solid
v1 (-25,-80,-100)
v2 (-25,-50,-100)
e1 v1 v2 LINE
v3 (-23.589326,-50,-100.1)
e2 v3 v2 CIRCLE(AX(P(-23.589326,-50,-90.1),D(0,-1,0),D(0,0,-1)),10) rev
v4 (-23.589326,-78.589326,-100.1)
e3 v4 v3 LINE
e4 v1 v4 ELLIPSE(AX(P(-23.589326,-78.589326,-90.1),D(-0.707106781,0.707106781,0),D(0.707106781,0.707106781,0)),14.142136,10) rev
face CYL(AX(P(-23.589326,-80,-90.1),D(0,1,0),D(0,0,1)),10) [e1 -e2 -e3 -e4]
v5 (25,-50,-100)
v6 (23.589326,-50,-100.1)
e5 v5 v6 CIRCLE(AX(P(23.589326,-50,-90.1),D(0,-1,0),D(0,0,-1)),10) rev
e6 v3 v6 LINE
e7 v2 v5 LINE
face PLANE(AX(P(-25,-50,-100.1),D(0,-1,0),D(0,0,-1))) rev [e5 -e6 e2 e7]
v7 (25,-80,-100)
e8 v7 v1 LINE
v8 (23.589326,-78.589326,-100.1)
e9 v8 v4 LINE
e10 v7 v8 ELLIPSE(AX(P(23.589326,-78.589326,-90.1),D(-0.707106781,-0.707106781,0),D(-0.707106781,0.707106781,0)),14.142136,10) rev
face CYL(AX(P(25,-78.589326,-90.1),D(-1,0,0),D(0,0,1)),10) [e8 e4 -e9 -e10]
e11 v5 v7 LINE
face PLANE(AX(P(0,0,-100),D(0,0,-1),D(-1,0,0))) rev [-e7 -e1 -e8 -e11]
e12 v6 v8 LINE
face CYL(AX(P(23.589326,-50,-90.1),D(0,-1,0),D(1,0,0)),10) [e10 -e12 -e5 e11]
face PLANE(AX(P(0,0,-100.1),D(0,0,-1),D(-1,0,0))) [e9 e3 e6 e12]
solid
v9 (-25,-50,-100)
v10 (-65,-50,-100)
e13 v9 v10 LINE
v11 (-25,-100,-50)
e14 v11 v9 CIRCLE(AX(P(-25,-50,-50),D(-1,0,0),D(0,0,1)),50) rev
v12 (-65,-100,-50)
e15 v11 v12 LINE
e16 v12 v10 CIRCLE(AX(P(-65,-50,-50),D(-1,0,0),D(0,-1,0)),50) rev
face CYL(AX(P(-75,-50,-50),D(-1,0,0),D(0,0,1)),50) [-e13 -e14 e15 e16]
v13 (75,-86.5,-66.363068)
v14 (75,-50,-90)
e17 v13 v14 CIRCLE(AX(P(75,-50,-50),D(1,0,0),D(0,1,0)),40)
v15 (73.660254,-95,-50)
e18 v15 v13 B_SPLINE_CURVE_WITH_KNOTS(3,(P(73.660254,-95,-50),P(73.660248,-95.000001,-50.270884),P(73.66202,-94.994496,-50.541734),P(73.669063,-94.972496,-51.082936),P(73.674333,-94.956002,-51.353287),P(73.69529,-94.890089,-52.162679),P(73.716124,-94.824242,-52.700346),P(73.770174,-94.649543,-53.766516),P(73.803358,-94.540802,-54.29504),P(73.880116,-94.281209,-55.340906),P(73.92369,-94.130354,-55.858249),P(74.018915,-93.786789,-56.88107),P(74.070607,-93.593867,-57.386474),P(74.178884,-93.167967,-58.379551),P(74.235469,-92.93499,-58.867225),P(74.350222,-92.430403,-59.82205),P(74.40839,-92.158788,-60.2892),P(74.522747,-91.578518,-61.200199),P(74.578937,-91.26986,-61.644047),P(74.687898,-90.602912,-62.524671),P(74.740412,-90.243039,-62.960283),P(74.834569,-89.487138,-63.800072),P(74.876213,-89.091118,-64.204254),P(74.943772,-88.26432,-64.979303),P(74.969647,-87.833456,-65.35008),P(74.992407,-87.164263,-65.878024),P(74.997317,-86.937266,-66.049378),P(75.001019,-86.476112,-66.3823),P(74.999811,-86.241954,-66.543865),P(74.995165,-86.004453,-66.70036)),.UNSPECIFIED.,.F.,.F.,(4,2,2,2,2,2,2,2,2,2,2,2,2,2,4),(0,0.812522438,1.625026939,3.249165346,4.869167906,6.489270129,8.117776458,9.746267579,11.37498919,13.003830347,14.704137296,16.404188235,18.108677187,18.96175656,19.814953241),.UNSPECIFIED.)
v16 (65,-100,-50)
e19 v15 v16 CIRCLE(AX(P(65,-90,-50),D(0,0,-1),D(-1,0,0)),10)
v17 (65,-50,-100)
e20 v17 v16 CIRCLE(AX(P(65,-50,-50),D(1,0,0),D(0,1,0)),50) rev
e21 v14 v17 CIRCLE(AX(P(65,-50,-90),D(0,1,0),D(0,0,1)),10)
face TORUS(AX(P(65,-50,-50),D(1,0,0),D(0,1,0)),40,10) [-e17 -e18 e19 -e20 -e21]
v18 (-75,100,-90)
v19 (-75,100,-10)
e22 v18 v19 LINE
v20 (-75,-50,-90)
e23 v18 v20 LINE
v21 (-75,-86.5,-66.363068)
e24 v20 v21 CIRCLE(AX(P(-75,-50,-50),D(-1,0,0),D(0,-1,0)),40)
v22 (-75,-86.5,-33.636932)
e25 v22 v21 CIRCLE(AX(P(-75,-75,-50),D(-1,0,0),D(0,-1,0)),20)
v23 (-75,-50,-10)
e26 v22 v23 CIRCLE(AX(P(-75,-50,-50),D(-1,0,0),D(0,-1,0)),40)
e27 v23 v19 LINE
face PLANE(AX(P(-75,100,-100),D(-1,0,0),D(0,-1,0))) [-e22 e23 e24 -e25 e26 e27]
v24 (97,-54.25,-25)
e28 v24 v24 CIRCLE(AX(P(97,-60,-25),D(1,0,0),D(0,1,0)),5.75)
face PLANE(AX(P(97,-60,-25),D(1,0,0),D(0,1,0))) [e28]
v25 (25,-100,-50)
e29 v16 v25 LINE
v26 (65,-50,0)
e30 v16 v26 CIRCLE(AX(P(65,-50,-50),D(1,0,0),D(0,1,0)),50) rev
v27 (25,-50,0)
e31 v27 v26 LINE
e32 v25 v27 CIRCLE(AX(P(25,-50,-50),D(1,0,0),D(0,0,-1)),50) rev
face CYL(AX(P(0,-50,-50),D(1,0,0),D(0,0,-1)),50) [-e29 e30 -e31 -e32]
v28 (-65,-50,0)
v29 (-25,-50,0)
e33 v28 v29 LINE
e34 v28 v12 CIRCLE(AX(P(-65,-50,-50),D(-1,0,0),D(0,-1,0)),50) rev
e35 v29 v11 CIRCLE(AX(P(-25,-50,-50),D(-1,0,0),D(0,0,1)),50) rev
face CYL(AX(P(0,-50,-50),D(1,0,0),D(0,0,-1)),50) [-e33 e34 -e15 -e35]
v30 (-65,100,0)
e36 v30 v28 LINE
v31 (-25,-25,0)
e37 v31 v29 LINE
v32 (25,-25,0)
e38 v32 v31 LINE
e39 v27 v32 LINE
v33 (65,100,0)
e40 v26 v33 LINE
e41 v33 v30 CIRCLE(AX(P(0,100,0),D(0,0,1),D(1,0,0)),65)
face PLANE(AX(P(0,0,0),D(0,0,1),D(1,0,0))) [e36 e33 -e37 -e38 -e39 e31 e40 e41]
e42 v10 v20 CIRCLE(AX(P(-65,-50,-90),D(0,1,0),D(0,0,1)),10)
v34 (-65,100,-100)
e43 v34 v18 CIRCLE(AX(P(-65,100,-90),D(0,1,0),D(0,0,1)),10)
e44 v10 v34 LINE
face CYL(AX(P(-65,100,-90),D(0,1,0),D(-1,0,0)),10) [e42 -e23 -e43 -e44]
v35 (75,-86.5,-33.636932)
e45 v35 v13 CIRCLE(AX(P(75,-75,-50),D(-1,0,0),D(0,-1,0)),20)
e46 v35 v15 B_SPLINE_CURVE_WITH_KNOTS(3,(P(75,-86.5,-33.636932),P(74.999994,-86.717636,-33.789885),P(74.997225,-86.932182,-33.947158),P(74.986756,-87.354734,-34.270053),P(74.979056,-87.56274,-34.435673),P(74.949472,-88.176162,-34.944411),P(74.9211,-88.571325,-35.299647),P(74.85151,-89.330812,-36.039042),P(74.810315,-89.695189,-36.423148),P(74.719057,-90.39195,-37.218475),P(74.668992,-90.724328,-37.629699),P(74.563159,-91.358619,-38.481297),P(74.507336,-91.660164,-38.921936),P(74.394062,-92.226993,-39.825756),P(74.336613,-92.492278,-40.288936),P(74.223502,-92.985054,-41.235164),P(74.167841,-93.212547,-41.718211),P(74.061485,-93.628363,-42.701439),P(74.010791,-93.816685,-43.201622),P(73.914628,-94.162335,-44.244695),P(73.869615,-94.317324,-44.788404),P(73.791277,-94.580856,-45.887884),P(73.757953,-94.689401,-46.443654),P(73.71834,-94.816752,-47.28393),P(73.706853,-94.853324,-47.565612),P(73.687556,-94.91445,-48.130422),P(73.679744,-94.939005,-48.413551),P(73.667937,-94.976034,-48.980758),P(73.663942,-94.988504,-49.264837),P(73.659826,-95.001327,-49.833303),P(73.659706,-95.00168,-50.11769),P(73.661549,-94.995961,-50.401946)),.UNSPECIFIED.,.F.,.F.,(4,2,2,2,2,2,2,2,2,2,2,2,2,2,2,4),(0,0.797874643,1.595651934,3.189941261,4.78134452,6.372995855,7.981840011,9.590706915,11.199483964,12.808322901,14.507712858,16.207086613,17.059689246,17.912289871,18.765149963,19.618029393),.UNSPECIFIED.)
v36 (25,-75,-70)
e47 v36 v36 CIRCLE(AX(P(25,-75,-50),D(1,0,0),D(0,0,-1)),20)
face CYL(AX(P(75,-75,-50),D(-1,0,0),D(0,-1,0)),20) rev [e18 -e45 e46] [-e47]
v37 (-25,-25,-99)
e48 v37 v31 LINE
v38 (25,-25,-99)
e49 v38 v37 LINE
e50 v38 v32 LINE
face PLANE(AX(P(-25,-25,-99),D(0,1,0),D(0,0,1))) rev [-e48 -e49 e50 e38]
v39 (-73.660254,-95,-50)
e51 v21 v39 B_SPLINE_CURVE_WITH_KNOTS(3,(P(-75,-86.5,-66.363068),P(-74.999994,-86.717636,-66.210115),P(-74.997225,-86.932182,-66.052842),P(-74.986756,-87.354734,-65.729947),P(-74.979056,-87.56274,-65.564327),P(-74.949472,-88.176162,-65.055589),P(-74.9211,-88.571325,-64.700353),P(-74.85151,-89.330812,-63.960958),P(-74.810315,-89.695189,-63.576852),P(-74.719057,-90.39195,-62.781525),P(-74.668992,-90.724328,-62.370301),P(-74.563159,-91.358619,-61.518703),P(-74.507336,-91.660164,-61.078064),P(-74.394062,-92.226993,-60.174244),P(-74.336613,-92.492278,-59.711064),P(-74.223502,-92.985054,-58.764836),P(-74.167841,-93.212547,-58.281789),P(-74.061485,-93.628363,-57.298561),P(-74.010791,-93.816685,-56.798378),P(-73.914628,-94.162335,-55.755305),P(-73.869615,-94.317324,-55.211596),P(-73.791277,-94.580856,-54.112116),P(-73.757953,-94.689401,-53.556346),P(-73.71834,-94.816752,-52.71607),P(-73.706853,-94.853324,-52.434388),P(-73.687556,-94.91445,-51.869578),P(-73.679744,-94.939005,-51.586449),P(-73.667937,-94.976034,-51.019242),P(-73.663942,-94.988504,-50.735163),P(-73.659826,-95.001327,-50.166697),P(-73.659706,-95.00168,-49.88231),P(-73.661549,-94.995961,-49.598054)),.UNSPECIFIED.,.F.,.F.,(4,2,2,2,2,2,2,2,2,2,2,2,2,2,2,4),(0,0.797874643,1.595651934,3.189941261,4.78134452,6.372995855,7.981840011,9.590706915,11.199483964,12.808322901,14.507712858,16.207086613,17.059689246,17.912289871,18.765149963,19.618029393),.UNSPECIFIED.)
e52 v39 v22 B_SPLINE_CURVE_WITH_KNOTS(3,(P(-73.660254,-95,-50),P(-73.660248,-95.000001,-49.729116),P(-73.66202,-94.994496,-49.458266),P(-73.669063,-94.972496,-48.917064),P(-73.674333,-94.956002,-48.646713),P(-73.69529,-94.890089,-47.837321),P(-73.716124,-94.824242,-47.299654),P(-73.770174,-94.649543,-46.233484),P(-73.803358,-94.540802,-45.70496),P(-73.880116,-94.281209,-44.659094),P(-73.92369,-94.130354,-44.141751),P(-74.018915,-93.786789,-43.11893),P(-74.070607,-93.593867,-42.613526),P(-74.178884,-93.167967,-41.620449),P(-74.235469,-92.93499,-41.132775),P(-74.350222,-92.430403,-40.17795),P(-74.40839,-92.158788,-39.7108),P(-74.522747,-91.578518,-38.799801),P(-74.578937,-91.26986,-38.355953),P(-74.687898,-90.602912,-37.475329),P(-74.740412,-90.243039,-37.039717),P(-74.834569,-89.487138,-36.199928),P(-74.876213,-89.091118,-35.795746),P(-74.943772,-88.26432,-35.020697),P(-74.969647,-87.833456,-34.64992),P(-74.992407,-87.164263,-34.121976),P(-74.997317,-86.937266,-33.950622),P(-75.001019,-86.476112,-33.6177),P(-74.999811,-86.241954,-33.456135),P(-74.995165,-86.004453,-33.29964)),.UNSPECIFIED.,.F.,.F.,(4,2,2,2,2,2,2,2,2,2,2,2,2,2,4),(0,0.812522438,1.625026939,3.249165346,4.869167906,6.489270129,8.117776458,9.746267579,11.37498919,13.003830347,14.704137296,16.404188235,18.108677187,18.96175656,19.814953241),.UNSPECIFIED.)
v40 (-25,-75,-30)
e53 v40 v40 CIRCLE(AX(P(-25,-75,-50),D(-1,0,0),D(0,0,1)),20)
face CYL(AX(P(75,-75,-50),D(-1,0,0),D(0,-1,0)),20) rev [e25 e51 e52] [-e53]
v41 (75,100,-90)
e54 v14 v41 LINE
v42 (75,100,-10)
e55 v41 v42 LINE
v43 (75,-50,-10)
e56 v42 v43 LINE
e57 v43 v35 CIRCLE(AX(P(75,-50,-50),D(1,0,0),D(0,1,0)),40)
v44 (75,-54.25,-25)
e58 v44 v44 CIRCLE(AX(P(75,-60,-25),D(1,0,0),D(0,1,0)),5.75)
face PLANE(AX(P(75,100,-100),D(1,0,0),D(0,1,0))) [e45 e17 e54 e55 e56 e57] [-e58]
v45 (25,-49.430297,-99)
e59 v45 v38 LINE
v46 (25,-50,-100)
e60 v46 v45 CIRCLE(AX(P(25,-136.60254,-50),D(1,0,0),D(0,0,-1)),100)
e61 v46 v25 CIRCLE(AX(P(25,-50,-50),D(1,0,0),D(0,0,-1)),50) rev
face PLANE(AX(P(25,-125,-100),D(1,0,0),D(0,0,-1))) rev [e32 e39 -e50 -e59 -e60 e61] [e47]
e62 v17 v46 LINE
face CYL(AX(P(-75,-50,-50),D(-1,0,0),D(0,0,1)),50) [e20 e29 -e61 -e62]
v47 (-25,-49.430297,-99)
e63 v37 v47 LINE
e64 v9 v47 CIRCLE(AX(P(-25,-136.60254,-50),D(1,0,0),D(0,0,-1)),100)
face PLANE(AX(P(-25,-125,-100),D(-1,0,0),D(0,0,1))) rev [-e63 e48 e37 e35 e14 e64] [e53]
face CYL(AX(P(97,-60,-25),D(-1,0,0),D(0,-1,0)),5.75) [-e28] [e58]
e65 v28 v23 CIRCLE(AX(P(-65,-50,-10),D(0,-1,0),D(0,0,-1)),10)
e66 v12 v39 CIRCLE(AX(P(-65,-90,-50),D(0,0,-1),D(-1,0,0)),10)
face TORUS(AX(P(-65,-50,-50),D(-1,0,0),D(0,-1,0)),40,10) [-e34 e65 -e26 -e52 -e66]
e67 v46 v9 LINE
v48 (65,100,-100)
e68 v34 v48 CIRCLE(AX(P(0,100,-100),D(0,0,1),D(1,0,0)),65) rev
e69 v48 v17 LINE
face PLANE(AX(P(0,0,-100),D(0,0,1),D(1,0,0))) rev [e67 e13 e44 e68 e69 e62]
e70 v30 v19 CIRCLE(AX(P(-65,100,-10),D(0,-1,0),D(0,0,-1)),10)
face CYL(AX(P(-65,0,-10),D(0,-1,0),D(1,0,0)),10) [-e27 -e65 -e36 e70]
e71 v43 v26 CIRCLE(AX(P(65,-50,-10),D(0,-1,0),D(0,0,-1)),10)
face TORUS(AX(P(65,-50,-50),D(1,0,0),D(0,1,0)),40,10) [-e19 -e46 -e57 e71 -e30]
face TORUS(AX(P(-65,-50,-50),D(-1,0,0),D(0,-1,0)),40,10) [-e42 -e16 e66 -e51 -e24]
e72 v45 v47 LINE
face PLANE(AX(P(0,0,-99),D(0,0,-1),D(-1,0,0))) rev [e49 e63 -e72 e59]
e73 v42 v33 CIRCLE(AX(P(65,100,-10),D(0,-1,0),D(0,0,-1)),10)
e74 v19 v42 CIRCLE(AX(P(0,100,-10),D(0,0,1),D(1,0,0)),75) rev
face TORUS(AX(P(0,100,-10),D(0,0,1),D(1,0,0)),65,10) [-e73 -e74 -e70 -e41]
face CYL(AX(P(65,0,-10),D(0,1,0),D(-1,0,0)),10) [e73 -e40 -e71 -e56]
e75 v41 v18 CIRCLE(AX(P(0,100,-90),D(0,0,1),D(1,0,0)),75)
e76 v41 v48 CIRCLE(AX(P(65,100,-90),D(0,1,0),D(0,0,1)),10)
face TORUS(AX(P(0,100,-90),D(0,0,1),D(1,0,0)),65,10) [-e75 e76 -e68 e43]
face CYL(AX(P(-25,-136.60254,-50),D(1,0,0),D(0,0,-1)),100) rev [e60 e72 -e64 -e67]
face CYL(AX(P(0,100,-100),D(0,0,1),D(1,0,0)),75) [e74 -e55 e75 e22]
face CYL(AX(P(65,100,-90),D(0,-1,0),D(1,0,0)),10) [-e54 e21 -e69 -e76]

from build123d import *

# Parameters (mm, degrees)
BOSS_EXTRUDE1_DEPTH    = 100
SKETCH2_W              = 50
SKETCH2_H              = 50
CUT_EXTRUDE1_DEPTH     = 161.078105936
CUT_EXTRUDE2_DEPTH     = 25
SKETCH7_R              = 20
CUT_EXTRUDE3_DEPTH     = 207.155281281
FILLET2_R              = 50
CUT_EXTRUDE6_START     = -100
CUT_EXTRUDE6_OUTLINE_W = 50
CUT_EXTRUDE6_OUTLINE_H = 6.698729811
CUT_EXTRUDE6_DEPTH     = 50
CUT_EXTRUDE7_DEPTH     = 25
BOSS_EXTRUDE2_DEPTH    = 100
FILLET4_R              = 10
SKETCH11_W             = 50
SKETCH11_H             = 25
CUT_EXTRUDE11_DEPTH    = 99
SKETCH16_W             = 50
SKETCH16_H             = 30
BOSS_EXTRUDE3_DEPTH    = 0.1
FILLET5_R              = 10
SKETCH17_R             = 5.75
BOSS_EXTRUDE4_DEPTH    = 22


with BuildPart() as part:
    # Sketch1 → Boss-Extrude1 (new body)
    with BuildSketch(Plane.XY):
        Polygon((-75, 100), (0.2, 100), (49.8, 100), (75, 100), (75, -100), (-75, -100), align=None)
    extrude(amount=-BOSS_EXTRUDE1_DEPTH)

    # Sketch2 → Cut-Extrude1 (cut, through all)
    with BuildSketch(Plane.XY):
        with Locations((0, -100)):
            Rectangle(SKETCH2_W, SKETCH2_H)
    extrude(amount=-CUT_EXTRUDE1_DEPTH, mode=Mode.SUBTRACT)

    # Sketch6 → Cut-Extrude2 (cut, symmetric)
    with BuildSketch(Plane(origin=(0, 0, 0), x_dir=(0, 0, -1), z_dir=(1, 0, 0))):
        with BuildLine():
            Line((100, -75), (0, -75))
            ThreePointArc((0, -75), (50, -25), (100, -75))
        make_face()
    extrude(amount=CUT_EXTRUDE2_DEPTH, both=True, mode=Mode.SUBTRACT)

    # Sketch7 → Cut-Extrude3 (cut, through all)
    with BuildSketch(Plane.ZY.offset(75)):
        with Locations(Location((-50, -75, 0), (0, 0, 270))):
            Circle(SKETCH7_R)
    extrude(amount=-CUT_EXTRUDE3_DEPTH, mode=Mode.SUBTRACT)

    # Fillet2
    fillet2_edges = [part.edges().sort_by_distance(p)[0] for p in [
        (-50, -100, -100),
        (-50, -100, 0),
    ]]
    fillet(fillet2_edges, radius=FILLET2_R - 0.0001)  # a hair under: the kernel refuses the full size

    # Cut-Extrude6: read off the stored shape, not the designer's step
    # Cut-Extrude6 outline → Cut-Extrude6 (cut)
    with BuildSketch(Plane(origin=(0, 0, 0), x_dir=(1, 0, 0), z_dir=(0, 1, 0)).offset(CUT_EXTRUDE6_START)):
        with Locations((0, 96.650635095)):
            Rectangle(CUT_EXTRUDE6_OUTLINE_W, CUT_EXTRUDE6_OUTLINE_H)
        with Locations((0, 3.349364906)):
            Rectangle(CUT_EXTRUDE6_OUTLINE_W, CUT_EXTRUDE6_OUTLINE_H)
    extrude(amount=CUT_EXTRUDE6_DEPTH, mode=Mode.SUBTRACT)

    # Sketch10 → Cut-Extrude7 (cut, symmetric)
    with BuildSketch(Plane(origin=(0, 0, 0), x_dir=(0, 0, -1), z_dir=(1, 0, 0))):
        with BuildLine():
            Line((0, -50), (100, -50))
            ThreePointArc((100, -50), (50, -36.602540378), (0, -50))
        make_face()
    extrude(amount=CUT_EXTRUDE7_DEPTH, both=True, mode=Mode.SUBTRACT)

    # Sketch15 → Boss-Extrude2 (add)
    with BuildSketch(Plane.XY):
        with BuildLine():
            Line((-75, 100), (75, 100))
            ThreePointArc((75, 100), (0, 175), (-75, 100))
        make_face()
    extrude(amount=-BOSS_EXTRUDE2_DEPTH)

    # Fillet4
    # the kernel refuses this fillet: 10 mm, written as the material it takes off along each edge
    with BuildSketch(Plane(origin=(0, 100, -100), x_dir=(1, 0, 0), z_dir=(0, -1, 0))) as fillet4_piece_1:
        with BuildLine():
            CenterArc((75 - FILLET4_R, FILLET4_R), FILLET4_R, 270, 90)
            Line((75, FILLET4_R), (75, 0))
            Line((75, 0), (75 - FILLET4_R, 0))
        make_face()
    revolve(axis=Axis((0, 100, -100), (0, 0, 1)), revolution_arc=180, mode=Mode.SUBTRACT)
    with BuildSketch(Plane(origin=(0, 100, 0), x_dir=(1, 0, 0), z_dir=(0, -1, 0))) as fillet4_piece_2:
        with BuildLine():
            CenterArc((75 - FILLET4_R, -FILLET4_R), FILLET4_R, 0, 90)
            Line((75, -FILLET4_R), (75, 0))
            Line((75, 0), (75 - FILLET4_R, 0))
        make_face()
    revolve(axis=Axis((0, 100, 0), (0, 0, 1)), revolution_arc=180, mode=Mode.SUBTRACT)
    with BuildSketch(Plane(origin=(-75, -50.0001, -100), x_dir=(0, 0, 1), z_dir=(0, 1, 0)), Plane(origin=(75, 100, 0), x_dir=(-1, 0, 0), z_dir=(0, -1, 0))) as fillet4_piece_3:
        with BuildLine():
            CenterArc((FILLET4_R, FILLET4_R), FILLET4_R, 180, 90)
            Line((0, FILLET4_R), (0, 0))
            Line((0, 0), (FILLET4_R, 0))
        make_face()
    extrude(amount=150.0001, mode=Mode.SUBTRACT)
    with BuildSketch(Plane(origin=(75, 100, -100), x_dir=(-1, 0, 0), z_dir=(0, -1, 0)), Plane(origin=(-75, -50.0001, 0), x_dir=(0, 0, -1), z_dir=(0, 1, 0))) as fillet4_piece_4:
        with BuildLine():
            CenterArc((FILLET4_R, -FILLET4_R), FILLET4_R, 90, 90)
            Line((0, -FILLET4_R), (0, 0))
            Line((0, 0), (FILLET4_R, 0))
        make_face()
    extrude(amount=150.0001, mode=Mode.SUBTRACT)
    with BuildSketch(Plane(origin=(75, -50.0001, -49.9999), x_dir=(0, 0, 1), z_dir=(0, 1, 0))) as fillet4_piece_5:
        with BuildLine():
            CenterArc((49.9999 - FILLET4_R, -FILLET4_R), FILLET4_R, 0, 90)
            Line((49.9999 - FILLET4_R, 0), (49.9999, 0))
            Line((49.9999, 0), (49.9999, -FILLET4_R))
        make_face()
    revolve(axis=Axis((75, -50.0001, -49.9999), (1, 0, 0)), revolution_arc=90, mode=Mode.SUBTRACT)
    with BuildSketch(Plane(origin=(75, -50.0001, -50.0001), x_dir=(0, 0, -1), z_dir=(0, 1, 0))) as fillet4_piece_6:
        with BuildLine():
            CenterArc((49.9999 - FILLET4_R, FILLET4_R), FILLET4_R, 270, 90)
            Line((49.9999, FILLET4_R), (49.9999, 0))
            Line((49.9999, 0), (49.9999 - FILLET4_R, 0))
        make_face()
    revolve(axis=Axis((75, -50.0001, -50.0001), (-1, 0, 0)), revolution_arc=90, mode=Mode.SUBTRACT)
    with BuildSketch(Plane(origin=(-75, -50.0001, -49.9999), x_dir=(0, 0, 1), z_dir=(0, 1, 0))) as fillet4_piece_7:
        with BuildLine():
            CenterArc((49.9999 - FILLET4_R, FILLET4_R), FILLET4_R, 270, 90)
            Line((49.9999, FILLET4_R), (49.9999, 0))
            Line((49.9999, 0), (49.9999 - FILLET4_R, 0))
        make_face()
    revolve(axis=Axis((-75, -50.0001, -49.9999), (1, 0, 0)), revolution_arc=90, mode=Mode.SUBTRACT)
    with BuildSketch(Plane(origin=(-75, -50.0001, -50.0001), x_dir=(0, 0, -1), z_dir=(0, 1, 0))) as fillet4_piece_8:
        with BuildLine():
            CenterArc((49.9999 - FILLET4_R, -FILLET4_R), FILLET4_R, 0, 90)
            Line((49.9999, -FILLET4_R), (49.9999, 0))
            Line((49.9999, 0), (49.9999 - FILLET4_R, 0))
        make_face()
    revolve(axis=Axis((-75, -50.0001, -50.0001), (-1, 0, 0)), revolution_arc=90, mode=Mode.SUBTRACT)
    with BuildSketch(Plane(origin=(-75, -100, -49.9999), x_dir=(0, 1, 0), z_dir=(0, 0, -1))) as fillet4_piece_9:
        with BuildLine():
            CenterArc((FILLET4_R, FILLET4_R), FILLET4_R, 180, 90)
            Line((0, FILLET4_R), (0, 0))
            Line((0, 0), (FILLET4_R, 0))
        make_face()
    extrude(amount=0.0002, mode=Mode.SUBTRACT)
    with BuildSketch(Plane(origin=(75, -100, -49.9999), x_dir=(0, 1, 0), z_dir=(0, 0, -1))) as fillet4_piece_10:
        with BuildLine():
            CenterArc((FILLET4_R, -FILLET4_R), FILLET4_R, 90, 90)
            Line((0, -FILLET4_R), (0, 0))
            Line((0, 0), (FILLET4_R, 0))
        make_face()
    extrude(amount=0.0002, mode=Mode.SUBTRACT)

    # Sketch11 → Cut-Extrude11 (cut)
    with BuildSketch(Plane.XY):
        with Locations((0, -37.5)):
            Rectangle(SKETCH11_W, SKETCH11_H)
    extrude(amount=-CUT_EXTRUDE11_DEPTH, mode=Mode.SUBTRACT)

    # Sketch17 → Boss-Extrude4 (add)
    with BuildSketch(Plane(origin=(75, 0, 0), x_dir=(0, 0, -1), z_dir=(1, 0, 0))):
        with Locations(Location((25, -60, 0), (0, 0, 90))):
            Circle(SKETCH17_R)
    extrude(amount=BOSS_EXTRUDE4_DEPTH)


with BuildPart() as body_2:
    # Sketch16 → Boss-Extrude3 (new body)
    with BuildSketch(Plane(origin=(0, 0, -100), x_dir=(-1, 0, 0), z_dir=(0, 0, -1))):
        with Locations((0, -65)):
            Rectangle(SKETCH16_W, SKETCH16_H)
    extrude(amount=BOSS_EXTRUDE3_DEPTH)

    # Fillet5
    # the kernel refuses this fillet: 10 mm, written as the material it takes off along each edge
    with BuildSketch(Plane(origin=(25, -46.473316005, -100.1), x_dir=(0, 0, 1), z_dir=(0, -1, 0)), Plane(origin=(-25, -83.526683995, -100.1), x_dir=(0, 0, 1), z_dir=(0, 1, 0))) as fillet5_piece_1:
        with BuildLine():
            CenterArc((10, 1.410673598), FILLET5_R, 180, 8.109614456)
            Line((0, 1.410673598), (0, 0))
            Line((0, 0), (0.1, 0))
        make_face()
    extrude(amount=37.05336799, mode=Mode.SUBTRACT)
    with BuildSketch(Plane(origin=(28.526683995, -80, -100.1), x_dir=(0, 0, 1), z_dir=(-1, 0, 0))) as fillet5_piece_2:
        with BuildLine():
            CenterArc((10, 1.410673598), FILLET5_R, 180, 8.109614456)
            Line((0, 1.410673598), (0, 0))
            Line((0, 0), (0.1, 0))
        make_face()
    extrude(amount=57.05336799, mode=Mode.SUBTRACT)


solid = Compound([part.part, body_2.part])
